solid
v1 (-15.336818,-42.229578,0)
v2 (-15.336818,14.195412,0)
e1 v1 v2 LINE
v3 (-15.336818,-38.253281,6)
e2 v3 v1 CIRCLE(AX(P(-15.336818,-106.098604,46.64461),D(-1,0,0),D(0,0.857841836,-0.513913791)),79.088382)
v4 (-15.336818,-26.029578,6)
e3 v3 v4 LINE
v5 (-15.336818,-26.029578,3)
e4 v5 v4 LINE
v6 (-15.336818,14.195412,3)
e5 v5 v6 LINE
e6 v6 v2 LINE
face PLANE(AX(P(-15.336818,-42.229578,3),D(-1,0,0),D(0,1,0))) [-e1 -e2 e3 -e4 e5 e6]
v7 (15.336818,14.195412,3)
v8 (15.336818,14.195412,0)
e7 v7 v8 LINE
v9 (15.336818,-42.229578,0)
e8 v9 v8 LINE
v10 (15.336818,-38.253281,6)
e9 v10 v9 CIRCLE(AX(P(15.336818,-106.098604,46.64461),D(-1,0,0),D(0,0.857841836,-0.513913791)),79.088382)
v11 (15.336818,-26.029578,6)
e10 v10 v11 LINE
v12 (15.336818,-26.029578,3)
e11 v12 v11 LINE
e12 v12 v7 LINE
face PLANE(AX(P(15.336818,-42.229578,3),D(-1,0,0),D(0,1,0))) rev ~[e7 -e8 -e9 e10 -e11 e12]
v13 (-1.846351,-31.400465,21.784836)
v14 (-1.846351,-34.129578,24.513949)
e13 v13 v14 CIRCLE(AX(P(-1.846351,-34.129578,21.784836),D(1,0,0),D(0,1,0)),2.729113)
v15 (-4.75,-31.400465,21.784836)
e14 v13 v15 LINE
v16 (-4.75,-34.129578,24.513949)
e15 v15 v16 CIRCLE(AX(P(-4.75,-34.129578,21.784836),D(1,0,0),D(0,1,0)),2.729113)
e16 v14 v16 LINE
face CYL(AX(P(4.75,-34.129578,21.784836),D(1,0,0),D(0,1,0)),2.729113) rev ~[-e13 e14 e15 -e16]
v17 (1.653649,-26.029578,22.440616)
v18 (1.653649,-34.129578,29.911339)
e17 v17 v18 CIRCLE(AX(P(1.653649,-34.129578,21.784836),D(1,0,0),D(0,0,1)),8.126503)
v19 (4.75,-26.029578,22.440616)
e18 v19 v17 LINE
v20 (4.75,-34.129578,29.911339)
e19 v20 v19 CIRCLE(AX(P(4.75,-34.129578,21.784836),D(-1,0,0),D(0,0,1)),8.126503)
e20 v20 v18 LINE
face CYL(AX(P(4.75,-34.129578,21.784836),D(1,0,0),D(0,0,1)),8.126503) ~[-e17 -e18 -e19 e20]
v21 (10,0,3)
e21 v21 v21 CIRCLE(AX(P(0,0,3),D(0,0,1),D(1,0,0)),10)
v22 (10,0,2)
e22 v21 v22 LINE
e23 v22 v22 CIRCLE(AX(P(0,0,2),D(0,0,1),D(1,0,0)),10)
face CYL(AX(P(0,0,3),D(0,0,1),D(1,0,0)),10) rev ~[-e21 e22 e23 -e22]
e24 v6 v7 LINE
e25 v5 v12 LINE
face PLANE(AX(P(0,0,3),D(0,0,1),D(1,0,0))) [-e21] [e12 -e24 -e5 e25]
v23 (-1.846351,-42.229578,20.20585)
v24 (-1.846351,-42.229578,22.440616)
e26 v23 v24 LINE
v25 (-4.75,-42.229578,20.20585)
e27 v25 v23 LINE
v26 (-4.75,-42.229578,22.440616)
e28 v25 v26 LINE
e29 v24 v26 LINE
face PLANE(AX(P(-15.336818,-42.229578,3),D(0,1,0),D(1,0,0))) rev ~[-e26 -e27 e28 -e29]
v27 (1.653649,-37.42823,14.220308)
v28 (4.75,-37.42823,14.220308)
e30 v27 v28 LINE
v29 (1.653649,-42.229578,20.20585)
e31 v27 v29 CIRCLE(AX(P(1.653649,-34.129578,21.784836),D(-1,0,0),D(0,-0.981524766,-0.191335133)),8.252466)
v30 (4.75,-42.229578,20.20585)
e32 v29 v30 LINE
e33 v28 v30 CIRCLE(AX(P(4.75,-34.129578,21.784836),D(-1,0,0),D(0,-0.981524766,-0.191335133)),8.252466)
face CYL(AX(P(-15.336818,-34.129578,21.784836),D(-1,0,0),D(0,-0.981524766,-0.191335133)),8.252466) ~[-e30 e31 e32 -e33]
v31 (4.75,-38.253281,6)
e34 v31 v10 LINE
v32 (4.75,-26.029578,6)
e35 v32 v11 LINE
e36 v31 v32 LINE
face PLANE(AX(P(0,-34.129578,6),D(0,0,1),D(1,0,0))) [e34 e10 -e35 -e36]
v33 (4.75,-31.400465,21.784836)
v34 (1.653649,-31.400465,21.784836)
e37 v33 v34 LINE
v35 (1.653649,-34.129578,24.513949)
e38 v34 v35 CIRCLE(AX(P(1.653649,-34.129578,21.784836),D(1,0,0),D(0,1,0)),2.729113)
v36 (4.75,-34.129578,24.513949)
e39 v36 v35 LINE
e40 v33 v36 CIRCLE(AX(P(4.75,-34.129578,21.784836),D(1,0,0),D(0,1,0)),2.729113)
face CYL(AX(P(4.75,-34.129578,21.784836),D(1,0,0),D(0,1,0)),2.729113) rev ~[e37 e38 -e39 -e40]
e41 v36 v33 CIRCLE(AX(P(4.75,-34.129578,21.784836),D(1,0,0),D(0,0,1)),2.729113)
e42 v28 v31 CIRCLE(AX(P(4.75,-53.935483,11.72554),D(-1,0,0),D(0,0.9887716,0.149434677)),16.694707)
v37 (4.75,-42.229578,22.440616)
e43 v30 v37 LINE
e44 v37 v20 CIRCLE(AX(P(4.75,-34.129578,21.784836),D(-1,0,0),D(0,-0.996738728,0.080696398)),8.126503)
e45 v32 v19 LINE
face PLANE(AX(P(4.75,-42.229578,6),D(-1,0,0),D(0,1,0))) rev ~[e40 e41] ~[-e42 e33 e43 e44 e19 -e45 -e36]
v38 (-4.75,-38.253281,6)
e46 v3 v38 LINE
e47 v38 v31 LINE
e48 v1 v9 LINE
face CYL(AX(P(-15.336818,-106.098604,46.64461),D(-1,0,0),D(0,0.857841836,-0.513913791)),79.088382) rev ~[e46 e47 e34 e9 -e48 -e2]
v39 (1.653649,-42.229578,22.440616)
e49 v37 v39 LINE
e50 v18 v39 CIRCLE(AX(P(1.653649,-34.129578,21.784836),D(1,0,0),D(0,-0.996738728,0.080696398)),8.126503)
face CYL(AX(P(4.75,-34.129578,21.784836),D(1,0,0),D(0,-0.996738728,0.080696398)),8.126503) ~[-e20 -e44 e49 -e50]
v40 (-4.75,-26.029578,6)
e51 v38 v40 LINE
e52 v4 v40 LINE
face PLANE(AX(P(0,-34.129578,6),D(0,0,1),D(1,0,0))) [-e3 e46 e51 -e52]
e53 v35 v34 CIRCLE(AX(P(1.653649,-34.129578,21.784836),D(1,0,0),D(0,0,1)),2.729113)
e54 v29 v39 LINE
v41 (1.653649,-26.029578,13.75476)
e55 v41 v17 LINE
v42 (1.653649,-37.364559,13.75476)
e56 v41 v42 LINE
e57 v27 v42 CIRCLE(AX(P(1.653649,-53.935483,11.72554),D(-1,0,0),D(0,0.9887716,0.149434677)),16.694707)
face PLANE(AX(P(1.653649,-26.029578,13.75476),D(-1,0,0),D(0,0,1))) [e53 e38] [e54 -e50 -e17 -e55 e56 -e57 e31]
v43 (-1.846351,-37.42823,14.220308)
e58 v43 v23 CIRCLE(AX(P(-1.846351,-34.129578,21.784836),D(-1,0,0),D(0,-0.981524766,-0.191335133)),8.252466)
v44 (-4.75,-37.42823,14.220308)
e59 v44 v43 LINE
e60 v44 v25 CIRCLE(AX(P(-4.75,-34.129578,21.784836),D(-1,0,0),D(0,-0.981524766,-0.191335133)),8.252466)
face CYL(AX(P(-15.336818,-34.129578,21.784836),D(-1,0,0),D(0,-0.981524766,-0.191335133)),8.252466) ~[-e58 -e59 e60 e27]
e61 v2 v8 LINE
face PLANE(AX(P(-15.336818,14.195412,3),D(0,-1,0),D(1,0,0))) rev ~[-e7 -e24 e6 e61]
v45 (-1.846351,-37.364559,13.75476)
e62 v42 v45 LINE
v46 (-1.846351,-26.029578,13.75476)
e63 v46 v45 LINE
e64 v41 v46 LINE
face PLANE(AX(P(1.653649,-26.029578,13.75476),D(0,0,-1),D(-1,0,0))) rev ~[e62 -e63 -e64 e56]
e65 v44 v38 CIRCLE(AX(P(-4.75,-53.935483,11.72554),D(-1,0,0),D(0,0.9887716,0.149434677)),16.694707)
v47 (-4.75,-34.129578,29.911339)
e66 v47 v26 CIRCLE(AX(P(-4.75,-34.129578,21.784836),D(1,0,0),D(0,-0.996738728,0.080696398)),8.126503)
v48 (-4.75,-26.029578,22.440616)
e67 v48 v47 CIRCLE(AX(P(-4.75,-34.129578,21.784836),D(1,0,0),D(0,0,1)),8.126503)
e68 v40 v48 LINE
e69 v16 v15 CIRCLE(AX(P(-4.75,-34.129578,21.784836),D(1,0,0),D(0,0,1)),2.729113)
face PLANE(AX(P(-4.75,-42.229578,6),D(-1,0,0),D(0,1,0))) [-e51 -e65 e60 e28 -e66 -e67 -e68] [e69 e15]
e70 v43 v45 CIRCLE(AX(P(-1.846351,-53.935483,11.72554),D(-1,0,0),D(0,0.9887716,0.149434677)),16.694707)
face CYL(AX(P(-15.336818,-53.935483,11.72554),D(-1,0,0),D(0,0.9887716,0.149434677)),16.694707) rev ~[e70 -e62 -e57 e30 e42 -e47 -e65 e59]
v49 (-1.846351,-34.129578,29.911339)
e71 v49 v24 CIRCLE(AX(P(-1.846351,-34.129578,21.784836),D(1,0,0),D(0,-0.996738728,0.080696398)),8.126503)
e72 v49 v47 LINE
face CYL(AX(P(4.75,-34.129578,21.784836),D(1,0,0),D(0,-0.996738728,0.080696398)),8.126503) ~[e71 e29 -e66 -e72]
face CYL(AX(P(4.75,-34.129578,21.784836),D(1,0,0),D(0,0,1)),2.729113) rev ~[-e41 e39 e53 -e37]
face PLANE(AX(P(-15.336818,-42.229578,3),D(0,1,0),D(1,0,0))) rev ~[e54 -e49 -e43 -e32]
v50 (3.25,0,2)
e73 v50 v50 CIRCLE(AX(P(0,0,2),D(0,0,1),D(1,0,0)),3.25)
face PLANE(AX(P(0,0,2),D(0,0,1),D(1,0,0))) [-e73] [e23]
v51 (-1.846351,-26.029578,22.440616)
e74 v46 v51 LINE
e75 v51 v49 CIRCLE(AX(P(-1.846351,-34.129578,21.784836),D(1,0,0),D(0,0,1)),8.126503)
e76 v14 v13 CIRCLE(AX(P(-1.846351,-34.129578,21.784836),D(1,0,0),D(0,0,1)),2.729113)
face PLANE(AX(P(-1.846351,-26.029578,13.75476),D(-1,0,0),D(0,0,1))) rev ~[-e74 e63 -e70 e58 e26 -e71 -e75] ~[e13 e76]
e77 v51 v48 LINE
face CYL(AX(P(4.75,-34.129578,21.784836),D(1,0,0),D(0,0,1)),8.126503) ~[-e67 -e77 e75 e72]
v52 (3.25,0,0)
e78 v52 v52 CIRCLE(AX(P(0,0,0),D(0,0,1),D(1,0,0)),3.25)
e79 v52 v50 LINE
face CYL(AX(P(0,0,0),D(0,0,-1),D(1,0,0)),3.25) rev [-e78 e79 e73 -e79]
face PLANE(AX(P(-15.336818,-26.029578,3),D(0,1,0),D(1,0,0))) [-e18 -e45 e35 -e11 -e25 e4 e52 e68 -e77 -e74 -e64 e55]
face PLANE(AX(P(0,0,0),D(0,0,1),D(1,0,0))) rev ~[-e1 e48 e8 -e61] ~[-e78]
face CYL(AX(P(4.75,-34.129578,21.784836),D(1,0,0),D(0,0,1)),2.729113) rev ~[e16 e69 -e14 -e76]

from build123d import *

# Parameters (mm, degrees)
F0_W      = 30.6736361235
F0_H      = 84.459155798
F0_R      = 3.25
F1_DEPTH  = 3
F2_W      = 30.6736361235
F2_H      = 16.2
F3_DEPTH  = 3
F4_W      = 9.5
F4_H      = 16.2
F5_DEPTH  = 24
F6_W      = 3.5
F6_H      = 16.2452395454
F7_DEPTH  = 18
F9_DEPTH  = 10
F10_R     = 10
F10_R_2   = 3.25
F11_DEPTH = 1
F12_W     = 30.6736361235
F12_H     = 28.0341655016
F13_DEPTH = 5
F15_DEPTH = 30.6746361235


# Not quite as in the source:
# - a feature names something its author has since deleted; it is built from what else it names


with BuildPart() as f1:
    # F0 (on Top) → F1 (new body)
    with BuildSketch(Plane.XY):
        Rectangle(F0_W, F0_H)
        Circle(F0_R, mode=Mode.SUBTRACT)
    extrude(amount=F1_DEPTH)

    # F2 (on face) → F3 (join)
    with BuildSketch(Plane.XY.offset(3)):
        with Locations((0, -34.129577899)):
            Rectangle(F2_W, F2_H)
    extrude(amount=F3_DEPTH)

    # F4 (on face) → F5 (join)
    with BuildSketch(Plane.XY.offset(6)):
        with Locations((0, -34.129577899)):
            Rectangle(F4_W, F4_H)
    extrude(amount=F5_DEPTH)

    # F6 (on face) → F7 (cut)
    with BuildSketch(Plane(origin=(0, -26.029577899, 0), x_dir=(-1, 0, 0), z_dir=(0, 1, 0))):
        with Locations((0.0963514363, 21.8773802273)):
            Rectangle(F6_W, F6_H)
    extrude(amount=-F7_DEPTH, mode=Mode.SUBTRACT)

    # F8 (on face) → F9 (cut)
    with BuildSketch(Plane.YZ.offset(4.75)):
        with BuildLine():
            Line((-26.029577899, 30), (-34.129577899, 30))
            Line((-34.129577899, 30), (-34.129577899, 29.9113391646))
            ThreePointArc((-34.129577899, 29.9113391646), (-28.6200020152, 27.7584969737), (-26.029577899, 22.440615928))
            Line((-26.029577899, 22.440615928), (-26.029577899, 30))
        make_face()
        with BuildLine():
            Line((-34.129577899, 29.9113391646), (-34.129577899, 30))
            Line((-34.129577899, 30), (-42.229577899, 30))
            Line((-42.229577899, 30), (-42.229577899, 22.440615928))
            ThreePointArc((-42.229577899, 22.440615928), (-39.6391537828, 27.7584969737), (-34.129577899, 29.9113391646))
        make_face()
        with BuildLine():
            ThreePointArc((-31.4004653301, 21.7848364264), (-32.1998038949, 23.7146104305), (-34.129577899, 24.5139489953))
            ThreePointArc((-34.129577899, 24.5139489953), (-36.0593519031, 19.8550624223), (-31.4004653301, 21.7848364264))
        make_face()
    extrude(amount=-F9_DEPTH, mode=Mode.SUBTRACT)

    # F10 (on face) → F11 (cut)
    with BuildSketch(Plane.XY.offset(3)):
        Circle(F10_R)
        Circle(F10_R_2, mode=Mode.SUBTRACT)
    extrude(amount=-F11_DEPTH, mode=Mode.SUBTRACT)

    # F12 (on face) → F13 (cut)
    with BuildSketch(Plane.XY.offset(3)):
        with Locations((0, 28.2124951482)):
            Rectangle(F12_W, F12_H)
    extrude(amount=-F13_DEPTH, mode=Mode.SUBTRACT)

    # F14 (on face) → F15 (cut, through all)
    with BuildSketch(Plane(origin=(-15.3368180618, 0, 0), x_dir=(0, -1, 0), z_dir=(-1, 0, 0))):
        with BuildLine():
            Line((38.2532812655, 6), (42.229577899, 6))
            Line((42.229577899, 6), (42.229577899, 20.2058496963))
            ThreePointArc((42.229577899, 20.2058496963), (40.5668907772, 16.6210972771), (37.4282303868, 14.220307964))
            ThreePointArc((37.4282303868, 14.220307964), (37.3242335364, 10.0583119864), (38.2532812655, 6))
        make_face()
        with BuildLine():
            Line((42.229577899, 0), (42.229577899, 6))
            Line((42.229577899, 6), (38.2532812655, 6))
            ThreePointArc((38.2532812655, 6), (40.1731353083, 2.9547402847), (42.229577899, 0))
        make_face()
    extrude(amount=-F15_DEPTH, mode=Mode.SUBTRACT)


solid = f1.part
